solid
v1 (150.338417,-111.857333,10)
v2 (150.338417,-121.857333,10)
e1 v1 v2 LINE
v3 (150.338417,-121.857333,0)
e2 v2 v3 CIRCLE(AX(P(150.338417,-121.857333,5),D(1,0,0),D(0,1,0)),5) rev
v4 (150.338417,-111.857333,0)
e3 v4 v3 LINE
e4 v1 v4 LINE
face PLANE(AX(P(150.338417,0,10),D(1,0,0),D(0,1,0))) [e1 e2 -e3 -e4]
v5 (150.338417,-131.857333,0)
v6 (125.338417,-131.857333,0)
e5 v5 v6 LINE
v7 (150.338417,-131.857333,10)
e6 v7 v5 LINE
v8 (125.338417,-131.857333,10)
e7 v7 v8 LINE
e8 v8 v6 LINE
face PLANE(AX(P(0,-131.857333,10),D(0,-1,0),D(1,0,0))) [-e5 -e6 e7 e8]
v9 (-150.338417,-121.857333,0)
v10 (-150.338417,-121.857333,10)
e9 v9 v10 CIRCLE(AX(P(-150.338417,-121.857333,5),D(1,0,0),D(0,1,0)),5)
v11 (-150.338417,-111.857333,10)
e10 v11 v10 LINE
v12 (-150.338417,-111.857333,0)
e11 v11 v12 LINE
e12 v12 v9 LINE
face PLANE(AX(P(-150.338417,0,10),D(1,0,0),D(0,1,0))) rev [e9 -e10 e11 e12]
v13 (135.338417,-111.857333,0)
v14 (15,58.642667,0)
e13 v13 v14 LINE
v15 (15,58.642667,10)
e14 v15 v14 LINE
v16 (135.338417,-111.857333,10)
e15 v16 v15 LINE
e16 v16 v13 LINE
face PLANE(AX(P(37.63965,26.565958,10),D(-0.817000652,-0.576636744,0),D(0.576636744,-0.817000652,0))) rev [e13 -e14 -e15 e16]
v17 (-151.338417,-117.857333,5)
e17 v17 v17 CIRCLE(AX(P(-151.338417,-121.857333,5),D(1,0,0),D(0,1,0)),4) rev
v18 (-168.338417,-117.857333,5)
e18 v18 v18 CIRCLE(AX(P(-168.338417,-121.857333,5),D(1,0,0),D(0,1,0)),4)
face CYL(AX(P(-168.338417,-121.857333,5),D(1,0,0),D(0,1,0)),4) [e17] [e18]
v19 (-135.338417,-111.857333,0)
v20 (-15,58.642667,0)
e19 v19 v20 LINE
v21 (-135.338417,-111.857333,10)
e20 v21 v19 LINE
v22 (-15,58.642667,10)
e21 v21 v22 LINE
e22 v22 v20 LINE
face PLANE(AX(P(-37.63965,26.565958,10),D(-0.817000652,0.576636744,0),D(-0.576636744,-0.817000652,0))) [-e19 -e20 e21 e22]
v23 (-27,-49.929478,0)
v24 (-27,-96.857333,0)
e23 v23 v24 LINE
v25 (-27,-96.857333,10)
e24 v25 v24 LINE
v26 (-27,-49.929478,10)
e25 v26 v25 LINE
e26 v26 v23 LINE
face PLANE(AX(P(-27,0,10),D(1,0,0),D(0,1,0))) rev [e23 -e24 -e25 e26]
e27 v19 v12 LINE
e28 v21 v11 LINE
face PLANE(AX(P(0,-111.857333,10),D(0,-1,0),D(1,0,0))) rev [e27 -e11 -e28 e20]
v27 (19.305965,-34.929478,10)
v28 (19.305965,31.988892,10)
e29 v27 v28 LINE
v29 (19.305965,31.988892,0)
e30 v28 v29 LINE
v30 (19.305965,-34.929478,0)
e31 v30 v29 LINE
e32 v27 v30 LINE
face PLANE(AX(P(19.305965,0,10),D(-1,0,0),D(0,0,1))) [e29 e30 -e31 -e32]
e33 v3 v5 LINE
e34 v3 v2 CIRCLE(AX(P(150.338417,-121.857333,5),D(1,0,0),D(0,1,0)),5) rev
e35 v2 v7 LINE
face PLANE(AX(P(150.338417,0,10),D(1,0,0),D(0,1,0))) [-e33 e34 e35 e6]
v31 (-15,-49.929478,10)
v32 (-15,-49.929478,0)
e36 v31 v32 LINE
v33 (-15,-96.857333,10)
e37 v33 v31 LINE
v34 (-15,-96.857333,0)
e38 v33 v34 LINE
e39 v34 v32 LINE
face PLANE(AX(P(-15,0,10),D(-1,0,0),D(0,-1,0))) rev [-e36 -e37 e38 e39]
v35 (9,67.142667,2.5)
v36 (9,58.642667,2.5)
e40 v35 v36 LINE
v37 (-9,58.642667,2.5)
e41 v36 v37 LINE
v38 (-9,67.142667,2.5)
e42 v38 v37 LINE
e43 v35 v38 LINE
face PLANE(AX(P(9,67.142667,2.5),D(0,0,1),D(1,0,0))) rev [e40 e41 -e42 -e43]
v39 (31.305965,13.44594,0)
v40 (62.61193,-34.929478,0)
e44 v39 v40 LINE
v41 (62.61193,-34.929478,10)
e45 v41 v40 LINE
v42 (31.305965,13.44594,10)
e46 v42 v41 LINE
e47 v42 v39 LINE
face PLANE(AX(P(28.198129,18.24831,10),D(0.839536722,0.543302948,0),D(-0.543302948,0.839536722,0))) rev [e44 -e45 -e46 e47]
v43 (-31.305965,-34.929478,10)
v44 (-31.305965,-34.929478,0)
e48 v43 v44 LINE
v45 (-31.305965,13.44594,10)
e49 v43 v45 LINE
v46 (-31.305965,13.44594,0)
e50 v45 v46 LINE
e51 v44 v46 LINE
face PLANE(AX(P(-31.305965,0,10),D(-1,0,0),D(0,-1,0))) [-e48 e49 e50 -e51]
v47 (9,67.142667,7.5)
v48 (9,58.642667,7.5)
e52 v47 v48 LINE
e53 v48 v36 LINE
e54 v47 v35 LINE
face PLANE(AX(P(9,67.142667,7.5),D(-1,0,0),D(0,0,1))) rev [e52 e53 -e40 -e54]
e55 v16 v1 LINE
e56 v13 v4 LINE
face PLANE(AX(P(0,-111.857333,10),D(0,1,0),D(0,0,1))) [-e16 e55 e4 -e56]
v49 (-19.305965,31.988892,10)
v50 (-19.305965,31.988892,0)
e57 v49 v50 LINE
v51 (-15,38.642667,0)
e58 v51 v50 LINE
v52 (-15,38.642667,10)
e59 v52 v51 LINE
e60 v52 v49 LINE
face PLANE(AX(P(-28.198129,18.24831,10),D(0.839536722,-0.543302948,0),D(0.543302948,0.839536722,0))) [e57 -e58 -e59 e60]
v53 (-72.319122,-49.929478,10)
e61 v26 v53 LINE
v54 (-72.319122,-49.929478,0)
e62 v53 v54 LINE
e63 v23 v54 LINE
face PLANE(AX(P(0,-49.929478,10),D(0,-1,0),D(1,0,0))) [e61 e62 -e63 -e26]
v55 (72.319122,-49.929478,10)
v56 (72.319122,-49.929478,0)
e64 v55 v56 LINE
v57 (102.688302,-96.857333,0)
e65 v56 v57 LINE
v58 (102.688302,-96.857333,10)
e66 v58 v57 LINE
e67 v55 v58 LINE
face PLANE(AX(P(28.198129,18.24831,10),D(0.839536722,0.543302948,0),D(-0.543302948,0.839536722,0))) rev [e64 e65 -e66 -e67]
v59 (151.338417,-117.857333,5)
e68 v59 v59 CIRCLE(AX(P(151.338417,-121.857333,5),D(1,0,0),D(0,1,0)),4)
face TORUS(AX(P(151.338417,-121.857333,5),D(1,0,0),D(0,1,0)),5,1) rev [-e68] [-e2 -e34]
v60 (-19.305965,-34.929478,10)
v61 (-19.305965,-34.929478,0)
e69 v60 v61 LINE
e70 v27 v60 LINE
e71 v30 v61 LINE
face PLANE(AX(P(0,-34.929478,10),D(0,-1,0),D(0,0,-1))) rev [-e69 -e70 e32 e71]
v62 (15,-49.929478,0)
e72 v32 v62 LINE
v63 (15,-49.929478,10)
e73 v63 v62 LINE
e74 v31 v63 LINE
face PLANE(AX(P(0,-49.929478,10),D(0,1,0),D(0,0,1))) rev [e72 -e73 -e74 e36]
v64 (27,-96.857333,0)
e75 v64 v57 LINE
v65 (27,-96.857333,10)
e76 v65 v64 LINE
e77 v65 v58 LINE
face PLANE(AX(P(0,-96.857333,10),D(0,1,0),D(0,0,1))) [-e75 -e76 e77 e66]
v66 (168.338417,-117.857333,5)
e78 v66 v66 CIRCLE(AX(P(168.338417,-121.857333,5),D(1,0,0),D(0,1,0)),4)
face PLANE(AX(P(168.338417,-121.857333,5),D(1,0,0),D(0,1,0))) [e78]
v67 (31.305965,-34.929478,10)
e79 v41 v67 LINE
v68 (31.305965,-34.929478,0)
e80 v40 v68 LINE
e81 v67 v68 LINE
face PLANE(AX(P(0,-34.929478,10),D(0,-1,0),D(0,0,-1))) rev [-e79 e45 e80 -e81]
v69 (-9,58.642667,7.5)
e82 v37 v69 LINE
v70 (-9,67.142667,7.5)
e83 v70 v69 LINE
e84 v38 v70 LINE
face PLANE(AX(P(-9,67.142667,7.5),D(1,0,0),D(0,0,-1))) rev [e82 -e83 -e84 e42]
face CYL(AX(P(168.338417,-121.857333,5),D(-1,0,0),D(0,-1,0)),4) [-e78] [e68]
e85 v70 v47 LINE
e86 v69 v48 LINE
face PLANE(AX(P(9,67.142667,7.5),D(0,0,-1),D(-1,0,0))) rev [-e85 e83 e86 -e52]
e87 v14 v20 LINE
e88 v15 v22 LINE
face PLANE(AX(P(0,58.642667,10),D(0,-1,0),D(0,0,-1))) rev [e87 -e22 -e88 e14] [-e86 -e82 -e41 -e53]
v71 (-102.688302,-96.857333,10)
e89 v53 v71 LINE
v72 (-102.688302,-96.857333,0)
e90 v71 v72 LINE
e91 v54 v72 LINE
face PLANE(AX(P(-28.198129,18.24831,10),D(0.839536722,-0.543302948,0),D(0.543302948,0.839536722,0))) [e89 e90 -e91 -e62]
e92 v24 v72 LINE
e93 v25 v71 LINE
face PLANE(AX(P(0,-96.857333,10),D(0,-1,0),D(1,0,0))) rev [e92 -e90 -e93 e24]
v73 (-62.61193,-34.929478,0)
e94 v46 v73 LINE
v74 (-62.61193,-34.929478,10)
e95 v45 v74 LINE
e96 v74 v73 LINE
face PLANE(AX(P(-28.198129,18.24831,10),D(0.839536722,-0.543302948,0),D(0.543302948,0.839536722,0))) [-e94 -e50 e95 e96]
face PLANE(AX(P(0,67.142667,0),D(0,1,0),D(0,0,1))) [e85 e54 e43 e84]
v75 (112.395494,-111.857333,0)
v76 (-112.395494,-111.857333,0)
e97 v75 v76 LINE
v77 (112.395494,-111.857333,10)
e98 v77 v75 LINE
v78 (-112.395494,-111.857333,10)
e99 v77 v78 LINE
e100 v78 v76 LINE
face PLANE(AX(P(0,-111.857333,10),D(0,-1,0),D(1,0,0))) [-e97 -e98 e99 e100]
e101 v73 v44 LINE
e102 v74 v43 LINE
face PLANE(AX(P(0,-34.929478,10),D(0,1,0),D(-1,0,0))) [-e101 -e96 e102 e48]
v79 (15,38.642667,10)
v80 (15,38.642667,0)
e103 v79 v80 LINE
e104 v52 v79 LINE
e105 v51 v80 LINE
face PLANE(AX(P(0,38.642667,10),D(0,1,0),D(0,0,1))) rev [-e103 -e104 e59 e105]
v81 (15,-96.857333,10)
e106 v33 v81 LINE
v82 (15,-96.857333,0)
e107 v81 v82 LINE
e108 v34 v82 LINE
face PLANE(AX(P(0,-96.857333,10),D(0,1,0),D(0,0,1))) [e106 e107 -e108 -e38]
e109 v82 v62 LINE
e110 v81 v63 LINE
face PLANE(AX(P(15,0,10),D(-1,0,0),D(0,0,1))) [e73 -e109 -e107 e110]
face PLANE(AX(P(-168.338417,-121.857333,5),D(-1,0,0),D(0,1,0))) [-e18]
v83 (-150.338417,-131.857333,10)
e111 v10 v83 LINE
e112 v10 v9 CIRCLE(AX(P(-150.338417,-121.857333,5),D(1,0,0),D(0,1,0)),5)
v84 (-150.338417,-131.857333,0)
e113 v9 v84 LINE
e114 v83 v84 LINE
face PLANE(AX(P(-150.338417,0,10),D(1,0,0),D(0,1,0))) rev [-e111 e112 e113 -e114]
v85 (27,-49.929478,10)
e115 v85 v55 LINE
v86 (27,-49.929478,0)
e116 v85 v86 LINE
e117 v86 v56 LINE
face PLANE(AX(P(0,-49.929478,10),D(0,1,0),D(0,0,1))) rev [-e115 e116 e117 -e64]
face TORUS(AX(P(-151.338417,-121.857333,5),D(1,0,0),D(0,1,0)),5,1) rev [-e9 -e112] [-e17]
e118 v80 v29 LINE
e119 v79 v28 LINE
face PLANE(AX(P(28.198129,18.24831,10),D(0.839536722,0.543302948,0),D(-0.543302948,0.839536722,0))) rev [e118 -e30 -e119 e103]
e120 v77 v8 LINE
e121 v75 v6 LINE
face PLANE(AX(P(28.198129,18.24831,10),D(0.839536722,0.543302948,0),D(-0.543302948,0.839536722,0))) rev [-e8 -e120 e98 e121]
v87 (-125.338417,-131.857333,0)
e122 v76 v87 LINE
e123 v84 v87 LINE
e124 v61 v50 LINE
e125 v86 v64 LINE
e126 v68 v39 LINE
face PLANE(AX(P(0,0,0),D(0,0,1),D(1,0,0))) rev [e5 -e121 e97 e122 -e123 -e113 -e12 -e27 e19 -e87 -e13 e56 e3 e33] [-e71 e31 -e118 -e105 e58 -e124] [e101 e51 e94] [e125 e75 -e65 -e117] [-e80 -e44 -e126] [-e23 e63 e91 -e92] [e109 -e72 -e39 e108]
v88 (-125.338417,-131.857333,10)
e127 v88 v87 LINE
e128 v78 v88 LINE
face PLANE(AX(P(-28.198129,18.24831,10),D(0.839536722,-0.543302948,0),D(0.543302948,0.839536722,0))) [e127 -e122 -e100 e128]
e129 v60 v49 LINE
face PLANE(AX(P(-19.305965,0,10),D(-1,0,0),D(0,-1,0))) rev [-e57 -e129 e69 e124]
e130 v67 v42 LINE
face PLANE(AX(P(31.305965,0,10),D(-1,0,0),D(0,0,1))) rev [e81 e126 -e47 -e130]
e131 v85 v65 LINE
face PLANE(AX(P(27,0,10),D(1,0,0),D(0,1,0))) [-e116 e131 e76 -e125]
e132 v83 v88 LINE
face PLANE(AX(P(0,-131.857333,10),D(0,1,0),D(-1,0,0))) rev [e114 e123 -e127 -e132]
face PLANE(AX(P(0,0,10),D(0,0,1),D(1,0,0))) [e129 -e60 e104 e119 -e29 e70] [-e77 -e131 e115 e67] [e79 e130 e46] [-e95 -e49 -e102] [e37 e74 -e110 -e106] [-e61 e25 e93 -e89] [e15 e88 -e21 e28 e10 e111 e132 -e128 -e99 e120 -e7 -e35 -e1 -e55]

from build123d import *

# Parameters (mm, degrees)
BOSS_EXTRUDE1_DEPTH  = 10
SKETCH6_R            = 4
BOSS_EXTRUDE3_DEPTH  = 18
FILLET2_R            = 1
FILLET2_OF_MIRROR1_R = 1
SKETCH7_W            = 18
SKETCH7_H            = 5
BOSS_EXTRUDE4_DEPTH  = 8.5


with BuildPart() as part:
    # Sketch2 → Boss-Extrude1 (new body)
    with BuildSketch(Plane.XY):
        Polygon((0, 58.642667291), (0, 38.642667291), (15, 38.642667291), (19.305964995, 31.988891988), (19.305964995, -34.929478391), (0, -34.929478391), (0, -49.929478391), (15, -49.929478391), (15, -96.857332709), (0, -96.857332709), (0, -111.857332709), (112.395493867, -111.857332709), (125.33841664, -131.857332709), (150.33841664, -131.857332709), (150.33841664, -111.857332709), (135.33841664, -111.857332709), (15, 58.642667291), align=None)
        Polygon((27, -49.929478391), (72.31912207, -49.929478391), (102.688301787, -96.857332709), (27, -96.857332709), align=None, mode=Mode.SUBTRACT)
        Polygon((31.305964995, -34.929478391), (31.305964995, 13.445939657), (62.61192999, -34.929478391), align=None, mode=Mode.SUBTRACT)
    boss_extrude1 = extrude(amount=BOSS_EXTRUDE1_DEPTH)

    # Sketch6 → Boss-Extrude3 (add)
    with BuildSketch(Plane(origin=(150.33841664, 0, 0), x_dir=(0, 0, -1), z_dir=(1, 0, 0))):
        with Locations(Location((-5, -121.857332709, 0), (0, 0, 90))):
            Circle(SKETCH6_R)
    boss_extrude3 = extrude(amount=BOSS_EXTRUDE3_DEPTH)

    # Fillet2
    fillet2_edges = [part.edges().sort_by_distance(p)[0] for p in [
        (150.33841664, -125.857332709, 5),
    ]]
    fillet(fillet2_edges, radius=FILLET2_R - 0.0001)  # a hair under: the kernel refuses the full size

    # Mirror1: Boss-Extrude1, Boss-Extrude3 across plane
    add(boss_extrude1.mirror(Plane(origin=(0, 0, 10), x_dir=(0, 0, 1), z_dir=(1, 0, 0))))
    add(boss_extrude3.mirror(Plane(origin=(0, 0, 10), x_dir=(0, 0, 1), z_dir=(1, 0, 0))))

    # Fillet2 of Mirror1
    fillet2_of_mirror1_edges = [part.edges().sort_by_distance(p)[0] for p in [
        (-150.33841664, -125.857332709, 5),
    ]]
    fillet(fillet2_of_mirror1_edges, radius=FILLET2_OF_MIRROR1_R - 0.0001)  # a hair under: the kernel refuses the full size

    # Sketch7 → Boss-Extrude4 (add)
    with BuildSketch(Plane(origin=(0, 58.642667291, 0), x_dir=(1, 0, 0), z_dir=(0, 1, 0))):
        with Locations((0, -5)):
            Rectangle(SKETCH7_W, SKETCH7_H)
    extrude(amount=BOSS_EXTRUDE4_DEPTH)


solid = part.part
